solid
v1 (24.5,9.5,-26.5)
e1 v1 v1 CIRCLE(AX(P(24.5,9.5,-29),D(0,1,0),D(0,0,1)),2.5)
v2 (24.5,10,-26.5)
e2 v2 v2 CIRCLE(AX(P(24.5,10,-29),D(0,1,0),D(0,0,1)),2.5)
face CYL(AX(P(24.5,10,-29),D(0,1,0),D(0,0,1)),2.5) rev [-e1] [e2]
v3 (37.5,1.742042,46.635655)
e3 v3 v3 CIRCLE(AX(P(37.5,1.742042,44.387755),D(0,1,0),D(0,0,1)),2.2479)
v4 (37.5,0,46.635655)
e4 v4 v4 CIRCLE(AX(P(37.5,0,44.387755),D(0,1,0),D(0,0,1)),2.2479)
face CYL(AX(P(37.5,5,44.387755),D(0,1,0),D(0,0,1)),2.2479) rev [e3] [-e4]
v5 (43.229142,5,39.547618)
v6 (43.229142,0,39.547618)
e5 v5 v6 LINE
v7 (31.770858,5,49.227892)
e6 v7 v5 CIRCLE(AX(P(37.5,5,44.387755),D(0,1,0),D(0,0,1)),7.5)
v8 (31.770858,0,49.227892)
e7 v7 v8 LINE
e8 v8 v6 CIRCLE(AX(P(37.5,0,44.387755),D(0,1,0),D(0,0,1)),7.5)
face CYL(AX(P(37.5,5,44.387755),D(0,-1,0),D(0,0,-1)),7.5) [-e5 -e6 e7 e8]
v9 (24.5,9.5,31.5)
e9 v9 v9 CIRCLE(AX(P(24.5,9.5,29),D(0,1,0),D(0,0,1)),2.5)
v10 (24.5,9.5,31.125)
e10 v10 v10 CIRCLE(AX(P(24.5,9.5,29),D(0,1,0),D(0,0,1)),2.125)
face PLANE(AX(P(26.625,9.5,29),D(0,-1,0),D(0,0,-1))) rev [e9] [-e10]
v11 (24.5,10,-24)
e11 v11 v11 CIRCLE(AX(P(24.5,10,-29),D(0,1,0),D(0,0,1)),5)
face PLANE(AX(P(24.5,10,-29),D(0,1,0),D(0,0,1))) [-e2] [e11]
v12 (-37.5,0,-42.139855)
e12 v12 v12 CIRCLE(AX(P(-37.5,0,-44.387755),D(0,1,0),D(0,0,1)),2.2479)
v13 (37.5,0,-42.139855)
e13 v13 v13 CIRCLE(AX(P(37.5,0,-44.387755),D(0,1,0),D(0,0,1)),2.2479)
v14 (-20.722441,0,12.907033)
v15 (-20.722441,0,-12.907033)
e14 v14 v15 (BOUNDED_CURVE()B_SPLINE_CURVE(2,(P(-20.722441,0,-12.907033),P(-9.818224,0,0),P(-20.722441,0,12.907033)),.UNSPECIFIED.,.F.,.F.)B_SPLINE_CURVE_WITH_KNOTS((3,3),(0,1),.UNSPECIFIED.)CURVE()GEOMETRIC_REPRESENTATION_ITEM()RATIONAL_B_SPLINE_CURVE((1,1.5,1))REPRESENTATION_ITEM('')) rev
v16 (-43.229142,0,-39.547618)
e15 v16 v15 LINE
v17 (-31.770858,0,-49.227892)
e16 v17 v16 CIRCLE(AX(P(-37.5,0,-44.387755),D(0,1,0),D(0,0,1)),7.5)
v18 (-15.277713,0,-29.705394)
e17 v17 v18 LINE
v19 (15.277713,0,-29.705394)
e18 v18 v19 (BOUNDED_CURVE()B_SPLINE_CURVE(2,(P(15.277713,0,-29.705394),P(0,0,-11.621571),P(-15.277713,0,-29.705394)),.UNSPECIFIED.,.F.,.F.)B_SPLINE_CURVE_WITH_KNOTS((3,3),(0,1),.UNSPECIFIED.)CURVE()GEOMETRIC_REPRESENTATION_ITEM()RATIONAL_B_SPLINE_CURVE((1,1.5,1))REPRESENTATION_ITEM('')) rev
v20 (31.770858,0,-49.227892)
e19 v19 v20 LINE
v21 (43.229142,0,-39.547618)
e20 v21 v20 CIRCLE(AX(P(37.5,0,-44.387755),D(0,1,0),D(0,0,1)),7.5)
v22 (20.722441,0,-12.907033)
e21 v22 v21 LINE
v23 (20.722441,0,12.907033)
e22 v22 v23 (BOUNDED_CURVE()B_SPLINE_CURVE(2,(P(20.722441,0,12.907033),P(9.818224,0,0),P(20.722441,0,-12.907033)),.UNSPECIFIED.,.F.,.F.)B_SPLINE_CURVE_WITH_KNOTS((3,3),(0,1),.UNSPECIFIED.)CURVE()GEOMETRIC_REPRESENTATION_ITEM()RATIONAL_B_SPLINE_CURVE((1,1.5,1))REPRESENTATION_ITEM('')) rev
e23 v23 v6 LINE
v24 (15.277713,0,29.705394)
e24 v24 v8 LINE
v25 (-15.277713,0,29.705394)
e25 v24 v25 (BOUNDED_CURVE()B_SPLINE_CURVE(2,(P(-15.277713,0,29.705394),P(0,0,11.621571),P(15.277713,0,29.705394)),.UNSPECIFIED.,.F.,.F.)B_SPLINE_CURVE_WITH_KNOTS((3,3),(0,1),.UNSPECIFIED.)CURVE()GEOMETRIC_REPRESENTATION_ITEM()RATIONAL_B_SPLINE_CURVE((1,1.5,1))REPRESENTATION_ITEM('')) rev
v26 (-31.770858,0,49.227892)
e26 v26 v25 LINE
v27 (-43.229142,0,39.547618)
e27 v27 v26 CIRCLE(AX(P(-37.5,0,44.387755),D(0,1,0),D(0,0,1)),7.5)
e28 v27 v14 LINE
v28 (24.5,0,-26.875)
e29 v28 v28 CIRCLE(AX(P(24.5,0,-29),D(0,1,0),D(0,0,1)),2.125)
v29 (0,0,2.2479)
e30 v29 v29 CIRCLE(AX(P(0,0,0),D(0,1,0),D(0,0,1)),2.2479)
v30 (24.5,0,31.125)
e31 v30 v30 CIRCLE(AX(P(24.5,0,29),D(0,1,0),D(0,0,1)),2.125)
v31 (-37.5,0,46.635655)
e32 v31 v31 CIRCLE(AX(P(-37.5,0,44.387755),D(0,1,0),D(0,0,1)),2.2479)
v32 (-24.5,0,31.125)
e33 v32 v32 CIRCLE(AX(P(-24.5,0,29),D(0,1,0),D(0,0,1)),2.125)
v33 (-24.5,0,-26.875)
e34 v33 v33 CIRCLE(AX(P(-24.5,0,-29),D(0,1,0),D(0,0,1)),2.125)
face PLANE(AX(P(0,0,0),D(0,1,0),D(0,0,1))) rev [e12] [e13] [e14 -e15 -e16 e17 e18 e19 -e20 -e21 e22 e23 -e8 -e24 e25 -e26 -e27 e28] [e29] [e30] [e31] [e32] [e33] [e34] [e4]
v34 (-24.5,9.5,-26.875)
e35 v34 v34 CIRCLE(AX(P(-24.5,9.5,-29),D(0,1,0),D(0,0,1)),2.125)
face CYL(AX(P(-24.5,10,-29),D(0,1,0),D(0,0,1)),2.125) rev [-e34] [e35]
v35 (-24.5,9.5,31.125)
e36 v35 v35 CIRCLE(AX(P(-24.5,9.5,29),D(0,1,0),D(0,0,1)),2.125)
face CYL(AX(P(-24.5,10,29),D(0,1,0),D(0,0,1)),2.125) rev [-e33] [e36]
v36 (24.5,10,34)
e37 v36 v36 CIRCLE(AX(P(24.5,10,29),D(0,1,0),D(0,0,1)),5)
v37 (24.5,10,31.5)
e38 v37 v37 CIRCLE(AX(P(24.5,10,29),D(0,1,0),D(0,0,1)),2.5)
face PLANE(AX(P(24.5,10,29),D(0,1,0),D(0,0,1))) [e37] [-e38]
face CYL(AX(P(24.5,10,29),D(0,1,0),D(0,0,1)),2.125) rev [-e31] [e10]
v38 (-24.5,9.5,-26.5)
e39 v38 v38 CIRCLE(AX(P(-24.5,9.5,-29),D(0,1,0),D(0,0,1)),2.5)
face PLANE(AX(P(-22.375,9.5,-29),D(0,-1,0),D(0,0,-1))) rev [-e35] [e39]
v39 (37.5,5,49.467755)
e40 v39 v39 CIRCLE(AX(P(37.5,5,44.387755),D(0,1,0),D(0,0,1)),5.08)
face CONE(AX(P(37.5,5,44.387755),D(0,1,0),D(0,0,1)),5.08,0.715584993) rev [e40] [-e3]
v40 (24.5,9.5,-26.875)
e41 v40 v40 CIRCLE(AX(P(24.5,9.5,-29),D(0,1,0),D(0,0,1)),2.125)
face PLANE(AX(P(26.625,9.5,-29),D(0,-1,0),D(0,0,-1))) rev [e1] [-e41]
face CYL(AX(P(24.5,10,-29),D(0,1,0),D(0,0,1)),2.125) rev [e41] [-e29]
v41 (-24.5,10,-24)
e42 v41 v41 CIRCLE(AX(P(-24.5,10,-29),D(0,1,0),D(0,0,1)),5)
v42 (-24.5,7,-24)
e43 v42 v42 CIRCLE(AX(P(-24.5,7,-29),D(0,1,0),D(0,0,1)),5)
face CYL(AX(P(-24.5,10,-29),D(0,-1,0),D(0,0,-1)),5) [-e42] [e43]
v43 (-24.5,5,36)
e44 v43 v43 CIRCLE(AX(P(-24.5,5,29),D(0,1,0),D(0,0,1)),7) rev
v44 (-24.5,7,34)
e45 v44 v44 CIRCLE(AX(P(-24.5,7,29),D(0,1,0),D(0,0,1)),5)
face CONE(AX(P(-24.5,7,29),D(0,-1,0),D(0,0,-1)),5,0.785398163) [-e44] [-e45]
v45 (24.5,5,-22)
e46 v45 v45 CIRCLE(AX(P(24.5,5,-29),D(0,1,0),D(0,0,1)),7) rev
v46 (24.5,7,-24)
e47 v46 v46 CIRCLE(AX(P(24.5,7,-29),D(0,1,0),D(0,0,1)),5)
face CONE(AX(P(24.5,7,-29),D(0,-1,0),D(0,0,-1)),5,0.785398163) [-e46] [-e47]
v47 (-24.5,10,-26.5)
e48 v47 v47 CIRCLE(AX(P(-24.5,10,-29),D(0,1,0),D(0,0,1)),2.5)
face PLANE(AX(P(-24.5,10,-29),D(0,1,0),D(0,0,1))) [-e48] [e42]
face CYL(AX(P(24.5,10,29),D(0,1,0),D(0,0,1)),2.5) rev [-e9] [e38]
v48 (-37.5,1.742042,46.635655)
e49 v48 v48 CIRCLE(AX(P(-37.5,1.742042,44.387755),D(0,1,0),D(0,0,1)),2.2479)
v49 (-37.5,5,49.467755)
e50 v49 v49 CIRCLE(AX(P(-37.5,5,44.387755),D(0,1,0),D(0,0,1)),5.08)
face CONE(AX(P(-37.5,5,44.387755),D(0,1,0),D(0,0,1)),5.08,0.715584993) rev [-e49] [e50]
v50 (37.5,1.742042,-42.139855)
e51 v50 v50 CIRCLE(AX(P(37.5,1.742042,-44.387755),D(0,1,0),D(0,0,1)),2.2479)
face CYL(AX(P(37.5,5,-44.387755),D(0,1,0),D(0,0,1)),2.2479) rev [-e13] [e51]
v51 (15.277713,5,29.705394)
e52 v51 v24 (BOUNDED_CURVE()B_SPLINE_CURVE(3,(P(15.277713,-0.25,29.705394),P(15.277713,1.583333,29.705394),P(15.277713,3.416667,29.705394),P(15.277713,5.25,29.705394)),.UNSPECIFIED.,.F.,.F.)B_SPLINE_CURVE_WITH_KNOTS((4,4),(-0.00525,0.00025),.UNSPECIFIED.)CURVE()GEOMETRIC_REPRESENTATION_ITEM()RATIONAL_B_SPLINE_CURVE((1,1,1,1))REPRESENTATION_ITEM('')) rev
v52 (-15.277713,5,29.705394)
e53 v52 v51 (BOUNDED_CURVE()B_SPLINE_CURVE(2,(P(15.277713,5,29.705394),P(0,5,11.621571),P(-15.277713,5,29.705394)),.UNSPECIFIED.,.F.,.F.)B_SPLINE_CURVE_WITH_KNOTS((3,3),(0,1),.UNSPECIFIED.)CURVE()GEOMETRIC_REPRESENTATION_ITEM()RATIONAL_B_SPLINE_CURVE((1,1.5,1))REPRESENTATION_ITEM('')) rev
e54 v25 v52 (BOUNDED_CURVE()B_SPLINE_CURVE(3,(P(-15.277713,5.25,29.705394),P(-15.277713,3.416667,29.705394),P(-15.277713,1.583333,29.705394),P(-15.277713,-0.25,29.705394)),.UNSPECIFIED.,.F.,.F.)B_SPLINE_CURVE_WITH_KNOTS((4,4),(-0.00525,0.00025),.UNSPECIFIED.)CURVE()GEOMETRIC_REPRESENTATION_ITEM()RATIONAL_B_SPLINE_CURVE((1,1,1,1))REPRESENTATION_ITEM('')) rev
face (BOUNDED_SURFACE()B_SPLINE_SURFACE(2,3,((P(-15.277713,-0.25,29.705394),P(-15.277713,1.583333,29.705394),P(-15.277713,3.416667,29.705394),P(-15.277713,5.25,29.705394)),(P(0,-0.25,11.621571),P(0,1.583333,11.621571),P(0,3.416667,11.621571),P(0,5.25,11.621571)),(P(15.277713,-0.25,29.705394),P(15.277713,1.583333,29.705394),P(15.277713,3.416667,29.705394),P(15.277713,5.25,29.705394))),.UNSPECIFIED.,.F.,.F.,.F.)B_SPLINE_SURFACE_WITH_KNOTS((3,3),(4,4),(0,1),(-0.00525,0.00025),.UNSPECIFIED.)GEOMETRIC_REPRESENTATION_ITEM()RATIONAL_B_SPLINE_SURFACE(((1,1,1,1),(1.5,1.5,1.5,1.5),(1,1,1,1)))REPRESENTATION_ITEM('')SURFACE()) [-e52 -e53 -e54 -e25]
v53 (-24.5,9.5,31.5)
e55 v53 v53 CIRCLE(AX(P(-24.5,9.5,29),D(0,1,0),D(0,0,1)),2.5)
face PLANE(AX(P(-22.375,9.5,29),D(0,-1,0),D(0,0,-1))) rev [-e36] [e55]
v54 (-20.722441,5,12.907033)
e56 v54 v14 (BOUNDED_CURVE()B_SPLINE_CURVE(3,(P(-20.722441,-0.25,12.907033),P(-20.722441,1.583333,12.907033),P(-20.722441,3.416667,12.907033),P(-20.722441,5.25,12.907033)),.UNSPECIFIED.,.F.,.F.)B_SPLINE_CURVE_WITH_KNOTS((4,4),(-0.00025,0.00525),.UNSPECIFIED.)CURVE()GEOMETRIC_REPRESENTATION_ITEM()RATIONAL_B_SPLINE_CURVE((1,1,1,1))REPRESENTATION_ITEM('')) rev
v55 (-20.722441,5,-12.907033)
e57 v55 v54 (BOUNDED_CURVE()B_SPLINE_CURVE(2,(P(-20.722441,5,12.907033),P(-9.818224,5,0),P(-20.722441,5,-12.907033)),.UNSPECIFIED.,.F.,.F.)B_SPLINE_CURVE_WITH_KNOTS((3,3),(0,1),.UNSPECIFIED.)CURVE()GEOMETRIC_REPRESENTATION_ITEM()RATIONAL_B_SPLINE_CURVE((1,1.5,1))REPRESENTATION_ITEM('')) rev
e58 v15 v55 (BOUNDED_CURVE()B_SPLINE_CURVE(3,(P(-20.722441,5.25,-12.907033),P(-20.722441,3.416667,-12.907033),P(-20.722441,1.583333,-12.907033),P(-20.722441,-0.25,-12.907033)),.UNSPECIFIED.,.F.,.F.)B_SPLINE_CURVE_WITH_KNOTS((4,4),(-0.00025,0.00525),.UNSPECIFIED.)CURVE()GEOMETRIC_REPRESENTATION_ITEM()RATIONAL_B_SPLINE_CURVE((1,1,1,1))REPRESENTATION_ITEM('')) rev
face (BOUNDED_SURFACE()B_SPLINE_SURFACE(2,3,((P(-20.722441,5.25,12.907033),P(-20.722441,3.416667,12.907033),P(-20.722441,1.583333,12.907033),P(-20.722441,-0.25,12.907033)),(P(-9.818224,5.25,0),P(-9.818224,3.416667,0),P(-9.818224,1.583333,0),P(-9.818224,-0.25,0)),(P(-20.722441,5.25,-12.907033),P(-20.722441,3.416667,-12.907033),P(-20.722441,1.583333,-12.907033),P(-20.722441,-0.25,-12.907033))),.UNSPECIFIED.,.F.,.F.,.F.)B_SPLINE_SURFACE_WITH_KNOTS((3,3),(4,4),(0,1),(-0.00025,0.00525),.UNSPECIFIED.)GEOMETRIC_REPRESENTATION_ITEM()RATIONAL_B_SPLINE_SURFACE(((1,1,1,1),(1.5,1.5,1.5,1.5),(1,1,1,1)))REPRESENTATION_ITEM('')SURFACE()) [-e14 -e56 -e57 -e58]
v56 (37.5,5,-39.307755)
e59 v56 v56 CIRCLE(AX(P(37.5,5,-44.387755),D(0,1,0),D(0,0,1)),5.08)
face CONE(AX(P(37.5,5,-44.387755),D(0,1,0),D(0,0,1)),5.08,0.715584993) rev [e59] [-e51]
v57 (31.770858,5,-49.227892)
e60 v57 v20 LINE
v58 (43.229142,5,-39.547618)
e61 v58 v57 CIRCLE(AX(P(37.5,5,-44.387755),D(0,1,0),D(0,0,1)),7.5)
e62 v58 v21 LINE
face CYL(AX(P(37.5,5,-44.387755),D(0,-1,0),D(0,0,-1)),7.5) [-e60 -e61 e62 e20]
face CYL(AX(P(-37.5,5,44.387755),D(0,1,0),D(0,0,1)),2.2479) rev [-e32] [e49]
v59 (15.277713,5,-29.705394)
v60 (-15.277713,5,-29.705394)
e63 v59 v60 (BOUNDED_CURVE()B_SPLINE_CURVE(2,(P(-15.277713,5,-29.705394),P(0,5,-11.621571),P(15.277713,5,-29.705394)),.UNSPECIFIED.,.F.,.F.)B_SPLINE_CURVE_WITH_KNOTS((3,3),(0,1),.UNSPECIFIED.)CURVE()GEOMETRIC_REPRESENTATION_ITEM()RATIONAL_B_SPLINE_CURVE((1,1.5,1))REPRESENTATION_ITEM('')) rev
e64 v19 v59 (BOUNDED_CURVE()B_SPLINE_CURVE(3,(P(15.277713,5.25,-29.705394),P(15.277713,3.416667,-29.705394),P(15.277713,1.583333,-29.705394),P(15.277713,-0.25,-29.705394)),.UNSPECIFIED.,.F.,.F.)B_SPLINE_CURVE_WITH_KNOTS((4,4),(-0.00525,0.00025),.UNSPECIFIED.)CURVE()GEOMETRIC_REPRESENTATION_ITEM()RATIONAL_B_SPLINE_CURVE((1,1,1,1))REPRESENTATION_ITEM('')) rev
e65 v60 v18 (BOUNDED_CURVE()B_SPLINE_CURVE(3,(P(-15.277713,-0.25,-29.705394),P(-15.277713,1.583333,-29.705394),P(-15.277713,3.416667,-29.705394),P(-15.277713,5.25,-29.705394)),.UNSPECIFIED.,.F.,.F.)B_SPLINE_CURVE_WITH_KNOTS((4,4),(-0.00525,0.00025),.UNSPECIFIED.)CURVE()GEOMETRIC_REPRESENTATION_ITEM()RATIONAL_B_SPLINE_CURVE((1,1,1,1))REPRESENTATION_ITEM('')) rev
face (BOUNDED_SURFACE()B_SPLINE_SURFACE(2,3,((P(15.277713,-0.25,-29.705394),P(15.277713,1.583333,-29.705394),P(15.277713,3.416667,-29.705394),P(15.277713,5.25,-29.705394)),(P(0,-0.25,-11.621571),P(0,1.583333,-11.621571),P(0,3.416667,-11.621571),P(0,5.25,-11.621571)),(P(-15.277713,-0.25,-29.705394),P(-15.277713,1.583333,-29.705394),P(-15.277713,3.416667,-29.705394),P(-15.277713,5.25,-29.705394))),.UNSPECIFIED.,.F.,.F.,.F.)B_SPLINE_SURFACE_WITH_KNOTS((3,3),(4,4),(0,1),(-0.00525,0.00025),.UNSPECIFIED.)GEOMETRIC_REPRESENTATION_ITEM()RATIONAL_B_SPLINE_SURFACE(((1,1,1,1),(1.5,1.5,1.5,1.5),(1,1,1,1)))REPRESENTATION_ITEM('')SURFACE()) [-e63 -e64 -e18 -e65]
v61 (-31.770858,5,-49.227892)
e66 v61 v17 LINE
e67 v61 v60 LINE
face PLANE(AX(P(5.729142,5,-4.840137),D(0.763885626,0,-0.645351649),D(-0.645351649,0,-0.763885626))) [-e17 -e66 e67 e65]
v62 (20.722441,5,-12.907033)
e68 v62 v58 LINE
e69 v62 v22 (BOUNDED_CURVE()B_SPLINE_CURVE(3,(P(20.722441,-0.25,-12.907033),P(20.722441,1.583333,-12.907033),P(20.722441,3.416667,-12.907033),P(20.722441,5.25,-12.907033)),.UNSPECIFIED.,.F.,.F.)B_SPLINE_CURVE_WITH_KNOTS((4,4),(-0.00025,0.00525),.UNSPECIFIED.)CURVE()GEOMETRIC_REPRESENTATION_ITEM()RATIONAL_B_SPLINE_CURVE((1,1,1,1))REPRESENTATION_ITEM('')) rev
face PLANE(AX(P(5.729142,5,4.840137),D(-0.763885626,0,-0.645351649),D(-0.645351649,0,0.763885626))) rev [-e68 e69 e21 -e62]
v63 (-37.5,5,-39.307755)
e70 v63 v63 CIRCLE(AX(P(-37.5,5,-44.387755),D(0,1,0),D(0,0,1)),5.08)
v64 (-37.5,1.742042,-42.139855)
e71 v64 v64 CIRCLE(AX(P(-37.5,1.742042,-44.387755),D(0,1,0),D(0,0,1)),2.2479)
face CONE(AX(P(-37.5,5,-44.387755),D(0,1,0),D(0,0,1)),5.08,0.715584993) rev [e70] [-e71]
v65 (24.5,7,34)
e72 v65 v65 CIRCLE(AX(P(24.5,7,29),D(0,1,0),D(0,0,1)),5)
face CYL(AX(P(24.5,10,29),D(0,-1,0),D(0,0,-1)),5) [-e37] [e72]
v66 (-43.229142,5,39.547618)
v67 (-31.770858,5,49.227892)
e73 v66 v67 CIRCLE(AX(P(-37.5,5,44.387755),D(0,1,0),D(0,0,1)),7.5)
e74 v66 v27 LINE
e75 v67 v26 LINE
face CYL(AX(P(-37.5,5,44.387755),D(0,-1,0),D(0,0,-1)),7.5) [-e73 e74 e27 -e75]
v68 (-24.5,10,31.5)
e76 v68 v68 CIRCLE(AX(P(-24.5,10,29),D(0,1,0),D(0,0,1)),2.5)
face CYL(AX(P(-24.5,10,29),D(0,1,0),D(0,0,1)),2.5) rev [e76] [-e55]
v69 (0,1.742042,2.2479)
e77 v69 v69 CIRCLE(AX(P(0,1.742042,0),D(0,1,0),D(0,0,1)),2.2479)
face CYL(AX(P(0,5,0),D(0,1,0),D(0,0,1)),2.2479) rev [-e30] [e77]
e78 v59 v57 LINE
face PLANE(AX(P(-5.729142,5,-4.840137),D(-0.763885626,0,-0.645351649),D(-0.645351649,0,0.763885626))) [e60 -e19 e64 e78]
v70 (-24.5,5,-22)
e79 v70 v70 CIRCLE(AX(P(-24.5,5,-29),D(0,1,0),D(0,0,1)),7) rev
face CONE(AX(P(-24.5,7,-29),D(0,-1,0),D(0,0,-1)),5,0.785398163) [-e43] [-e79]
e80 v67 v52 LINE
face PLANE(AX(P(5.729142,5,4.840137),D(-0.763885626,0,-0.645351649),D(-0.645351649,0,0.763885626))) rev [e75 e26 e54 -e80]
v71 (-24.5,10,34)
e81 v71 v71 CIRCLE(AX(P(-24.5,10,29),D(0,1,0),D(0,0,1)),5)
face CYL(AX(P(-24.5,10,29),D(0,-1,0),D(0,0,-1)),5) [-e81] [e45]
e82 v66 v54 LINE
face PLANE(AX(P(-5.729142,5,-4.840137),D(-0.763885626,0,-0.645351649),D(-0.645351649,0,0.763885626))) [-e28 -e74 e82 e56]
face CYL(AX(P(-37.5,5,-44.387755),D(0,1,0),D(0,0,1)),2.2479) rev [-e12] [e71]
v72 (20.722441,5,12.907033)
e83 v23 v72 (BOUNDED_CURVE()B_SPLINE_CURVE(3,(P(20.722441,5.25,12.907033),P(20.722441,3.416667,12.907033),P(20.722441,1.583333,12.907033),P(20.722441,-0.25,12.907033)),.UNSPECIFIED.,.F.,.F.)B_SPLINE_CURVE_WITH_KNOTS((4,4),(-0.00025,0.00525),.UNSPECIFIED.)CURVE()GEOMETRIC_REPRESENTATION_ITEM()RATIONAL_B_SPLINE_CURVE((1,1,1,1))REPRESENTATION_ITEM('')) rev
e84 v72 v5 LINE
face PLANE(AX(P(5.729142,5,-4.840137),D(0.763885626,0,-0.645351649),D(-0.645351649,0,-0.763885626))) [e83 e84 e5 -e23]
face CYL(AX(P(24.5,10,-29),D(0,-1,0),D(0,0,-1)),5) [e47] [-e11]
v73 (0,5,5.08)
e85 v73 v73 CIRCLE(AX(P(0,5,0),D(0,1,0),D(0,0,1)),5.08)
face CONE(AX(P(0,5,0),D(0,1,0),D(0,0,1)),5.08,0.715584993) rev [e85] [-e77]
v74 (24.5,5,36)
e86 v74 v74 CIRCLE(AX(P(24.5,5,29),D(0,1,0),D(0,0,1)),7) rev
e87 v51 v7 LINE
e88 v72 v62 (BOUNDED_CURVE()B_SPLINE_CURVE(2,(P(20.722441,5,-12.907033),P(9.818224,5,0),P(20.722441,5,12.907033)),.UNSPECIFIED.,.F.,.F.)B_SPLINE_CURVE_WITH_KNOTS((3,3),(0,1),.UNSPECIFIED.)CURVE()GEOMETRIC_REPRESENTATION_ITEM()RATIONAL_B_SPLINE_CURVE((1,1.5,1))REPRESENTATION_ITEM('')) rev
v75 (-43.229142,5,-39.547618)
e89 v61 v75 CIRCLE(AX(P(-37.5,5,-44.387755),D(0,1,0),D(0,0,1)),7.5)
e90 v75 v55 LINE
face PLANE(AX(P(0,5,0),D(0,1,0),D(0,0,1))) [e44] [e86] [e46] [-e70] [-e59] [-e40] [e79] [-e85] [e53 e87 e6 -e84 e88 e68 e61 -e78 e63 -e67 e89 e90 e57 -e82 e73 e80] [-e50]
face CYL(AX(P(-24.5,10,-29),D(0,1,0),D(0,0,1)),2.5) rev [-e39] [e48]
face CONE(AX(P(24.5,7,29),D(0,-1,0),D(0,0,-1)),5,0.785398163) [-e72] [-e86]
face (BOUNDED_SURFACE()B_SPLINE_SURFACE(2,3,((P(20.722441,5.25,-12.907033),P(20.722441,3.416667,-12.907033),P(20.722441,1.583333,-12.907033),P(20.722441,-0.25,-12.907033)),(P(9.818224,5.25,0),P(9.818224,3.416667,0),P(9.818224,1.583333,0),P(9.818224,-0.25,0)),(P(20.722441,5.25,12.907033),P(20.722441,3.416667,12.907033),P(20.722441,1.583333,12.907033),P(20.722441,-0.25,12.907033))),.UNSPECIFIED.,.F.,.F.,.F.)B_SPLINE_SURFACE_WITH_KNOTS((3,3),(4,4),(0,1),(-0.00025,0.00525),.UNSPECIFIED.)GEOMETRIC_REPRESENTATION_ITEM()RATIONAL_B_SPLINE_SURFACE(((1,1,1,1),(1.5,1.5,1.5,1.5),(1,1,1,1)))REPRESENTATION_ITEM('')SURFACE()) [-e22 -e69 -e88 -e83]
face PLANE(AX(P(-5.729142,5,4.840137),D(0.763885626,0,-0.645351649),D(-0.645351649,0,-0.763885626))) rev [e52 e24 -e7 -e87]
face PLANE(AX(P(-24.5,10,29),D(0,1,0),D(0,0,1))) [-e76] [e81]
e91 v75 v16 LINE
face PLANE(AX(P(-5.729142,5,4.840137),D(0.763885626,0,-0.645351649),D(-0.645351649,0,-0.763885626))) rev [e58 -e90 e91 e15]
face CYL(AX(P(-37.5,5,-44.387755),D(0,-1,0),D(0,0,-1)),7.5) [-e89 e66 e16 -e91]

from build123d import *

# Parameters (mm, degrees)
BOSS_EXTRUDE1_DEPTH                              = 5
CSK_FOR_8_FLAT_HEAD_SOCKET_CAP_SCREW1_A_COUNT    = 2
CSK_FOR_8_FLAT_HEAD_SOCKET_CAP_SCREW1_A_PITCH    = 75
CSK_FOR_8_FLAT_HEAD_SOCKET_CAP_SCRE_2_COUNT      = 2
CSK_FOR_8_FLAT_HEAD_SOCKET_CAP_SCRE_2_PITCH      = 116.215709833
CSK_FOR_8_FLAT_HEAD_SOCKET_CAP_SCRE_3_COUNT      = 2
CSK_FOR_8_FLAT_HEAD_SOCKET_CAP_SCRE_3_PITCH      = 88.775510204
CSK_FOR_8_FLAT_HEAD_SOCKET_CAP_SCRE_4_COUNT      = 2
CSK_FOR_8_FLAT_HEAD_SOCKET_CAP_SCRE_4_PITCH      = 58.107854917
SKETCH4_R                                        = 5
BOSS_EXTRUDE2_DEPTH                              = 5
CHAMFER1_SIZE                                    = 2
CBORE_FOR_M5_HEX_HEAD_MACHINE_SCREW1_D           = 4.25
CBORE_FOR_M5_HEX_HEAD_MACHINE_SCREW1_CBORE_D     = 5
CBORE_FOR_M5_HEX_HEAD_MACHINE_SCREW1_CBORE_DEPTH = 0.5


with BuildPart() as part:
    # Sketch1 → Boss-Extrude1 (new body)
    with BuildSketch(Plane(origin=(0, 0, 0), x_dir=(1, 0, 0), z_dir=(0, 1, 0))):
        with BuildLine():
            Line((0, -11.621570983), (-9.818223762, 0))
            Line((-9.818223762, 0), (-43.229142192, -39.547617733))
            ThreePointArc((-43.229142192, -39.547617733), (-42.340137369, -50.116897294), (-31.770857808, -49.227892471))
            Line((-31.770857808, -49.227892471), (0, -11.621570983))
        make_face()
        Polygon((9.818223762, 0), (0, 11.621570983), (-9.818223762, 0), (0, -11.621570983), align=None)
        with BuildLine():
            Line((0, 11.621570983), (-31.770857808, 49.227892471))
            ThreePointArc((-31.770857808, 49.227892471), (-42.340137369, 50.116897294), (-43.229142192, 39.547617733))
            Line((-43.229142192, 39.547617733), (-9.818223762, 0))
            Line((-9.818223762, 0), (0, 11.621570983))
        make_face()
        with BuildLine():
            Line((31.770857808, 49.227892471), (0, 11.621570983))
            Line((0, 11.621570983), (9.818223762, 0))
            Line((9.818223762, 0), (43.229142192, 39.547617733))
            ThreePointArc((43.229142192, 39.547617733), (42.340137369, 50.116897294), (31.770857808, 49.227892471))
        make_face()
        with BuildLine():
            Line((43.229142192, -39.547617733), (9.818223762, 0))
            Line((9.818223762, 0), (0, -11.621570983))
            Line((0, -11.621570983), (31.770857808, -49.227892471))
            ThreePointArc((31.770857808, -49.227892471), (42.340137369, -50.116897294), (43.229142192, -39.547617733))
        make_face()
    extrude(amount=BOSS_EXTRUDE1_DEPTH)

    # Sketch3 → CSK for #8 Flat Head Socket Cap Screw1 (revolve, cut)
    with BuildSketch(Plane(origin=(-37.5, 5, -44.387755102), x_dir=(0, 0, 1), z_dir=(1, 0, 0))):
        Polygon((0, 0), (0, 5), (2.2479, 5), (2.2479, 3.257958366), (5.08, 0), align=None)
    csk_for_8_flat_head_socket_cap_screw1 = revolve(axis=Axis((-37.5, 11.35, -44.387755102), (0, -1, 0)), mode=Mode.SUBTRACT)

    # CSK for #8 Flat Head Socket Cap Screw1 a: CSK for #8 Flat Head Socket Cap Screw1 ×2
    with Locations(*[(i * CSK_FOR_8_FLAT_HEAD_SOCKET_CAP_SCREW1_A_PITCH, 0, 0) for i in range(1, CSK_FOR_8_FLAT_HEAD_SOCKET_CAP_SCREW1_A_COUNT)]):
        add(csk_for_8_flat_head_socket_cap_screw1, mode=Mode.SUBTRACT)

    # CSK for _8 Flat Head Socket Cap Scre 2: CSK for #8 Flat Head Socket Cap Screw1 ×2
    with Locations(*[Vector(0.6453516491682099, 0, 0.7638856255460446) * (i * CSK_FOR_8_FLAT_HEAD_SOCKET_CAP_SCRE_2_PITCH) for i in range(1, CSK_FOR_8_FLAT_HEAD_SOCKET_CAP_SCRE_2_COUNT)]):
        add(csk_for_8_flat_head_socket_cap_screw1, mode=Mode.SUBTRACT)

    # CSK for _8 Flat Head Socket Cap Scre 3: CSK for #8 Flat Head Socket Cap Screw1 ×2
    with Locations(*[(0, 0, i * CSK_FOR_8_FLAT_HEAD_SOCKET_CAP_SCRE_3_PITCH) for i in range(1, CSK_FOR_8_FLAT_HEAD_SOCKET_CAP_SCRE_3_COUNT)]):
        add(csk_for_8_flat_head_socket_cap_screw1, mode=Mode.SUBTRACT)

    # CSK for _8 Flat Head Socket Cap Scre 4: CSK for #8 Flat Head Socket Cap Screw1 ×2
    with Locations(*[Vector(0.64535164916821, 0, 0.7638856255460446) * (i * CSK_FOR_8_FLAT_HEAD_SOCKET_CAP_SCRE_4_PITCH) for i in range(1, CSK_FOR_8_FLAT_HEAD_SOCKET_CAP_SCRE_4_COUNT)]):
        add(csk_for_8_flat_head_socket_cap_screw1, mode=Mode.SUBTRACT)

    # Sketch4 → Boss-Extrude2 (add)
    with BuildSketch(Plane(origin=(0, 5, 0), x_dir=(1, 0, 0), z_dir=(0, 1, 0))):
        with Locations(Location((-24.5, 29, 0), (0, 0, 270))):
            Circle(SKETCH4_R)
        with Locations(Location((24.5, 29, 0), (0, 0, 270))):
            Circle(SKETCH4_R)
        with Locations(Location((24.5, -29, 0), (0, 0, 270))):
            Circle(SKETCH4_R)
        with Locations(Location((-24.5, -29, 0), (0, 0, 270))):
            Circle(SKETCH4_R)
    extrude(amount=BOSS_EXTRUDE2_DEPTH)

    # Chamfer1
    chamfer1_edges = [part.edges().sort_by_distance(p)[0] for p in [
        (-24.5, 5, -34),
        (24.5, 5, -34),
        (24.5, 5, 24),
        (-24.5, 5, 24),
    ]]
    chamfer(chamfer1_edges, length=CHAMFER1_SIZE)

    # CBORE for M5 Hex Head Machine Screw1 (through all)
    with Locations(Plane(origin=(0, 10, 0), x_dir=(1, 0, 0), z_dir=(0, 1, 0))):
        with Locations((-24.5, 29), (24.5, 29), (24.5, -29), (-24.5, -29)):
            CounterBoreHole(CBORE_FOR_M5_HEX_HEAD_MACHINE_SCREW1_D / 2, CBORE_FOR_M5_HEX_HEAD_MACHINE_SCREW1_CBORE_D / 2, CBORE_FOR_M5_HEX_HEAD_MACHINE_SCREW1_CBORE_DEPTH)

    # Fillet1
    # a fillet whose section is not a circle: 20 mm, written as the material it adds along each edge
    with BuildSketch(Plane(origin=(-9.818223762, 0, 0), x_dir=(-0.6453516491682094, 0, 0.7638856255460448), z_dir=(0, 1, 0))) as fillet1_piece_1:
        with BuildLine():
            Bezier((16.896551724, 0), (0, 0), (-2.822442205, -16.659150043), weights=[1, 1.5, 1])
            Line((-2.822442205, -16.659150043), (0, 0))
            Line((0, 0), (16.896551724, 0))
        make_face()
    extrude(amount=5)
    with BuildSketch(Plane(origin=(9.818223762, 0, 0), x_dir=(0.6453516491682099, 0, 0.7638856255460446), z_dir=(0, 1, 0))) as fillet1_piece_2:
        with BuildLine():
            Bezier((16.896551724, 0), (0, 0), (-2.822442205, 16.659150043), weights=[1, 1.5, 1])
            Line((-2.822442205, 16.659150043), (0, 0))
            Line((0, 0), (16.896551724, 0))
        make_face()
    extrude(amount=5)
    with BuildSketch(Plane(origin=(0, 0, 11.621570983), x_dir=(-0.6453516491682095, 0, 0.7638856255460447), z_dir=(0, 1, 0))) as fillet1_piece_3:
        with BuildLine():
            Bezier((23.673469388, 0), (0, 0), (3.954475459, 23.340849957), weights=[1, 1.5, 1])
            Line((3.954475459, 23.340849957), (0, 0))
            Line((0, 0), (23.673469388, 0))
        make_face()
    extrude(amount=5)
    with BuildSketch(Plane(origin=(0, 0, -11.621570983), x_dir=(-0.6453516491682103, 0, -0.7638856255460442), z_dir=(0, 1, 0))) as fillet1_piece_4:
        with BuildLine():
            Bezier((23.673469388, 0), (0, 0), (3.954475459, -23.340849957), weights=[1, 1.5, 1])
            Line((3.954475459, -23.340849957), (0, 0))
            Line((0, 0), (23.673469388, 0))
        make_face()
    extrude(amount=5)


solid = part.part
